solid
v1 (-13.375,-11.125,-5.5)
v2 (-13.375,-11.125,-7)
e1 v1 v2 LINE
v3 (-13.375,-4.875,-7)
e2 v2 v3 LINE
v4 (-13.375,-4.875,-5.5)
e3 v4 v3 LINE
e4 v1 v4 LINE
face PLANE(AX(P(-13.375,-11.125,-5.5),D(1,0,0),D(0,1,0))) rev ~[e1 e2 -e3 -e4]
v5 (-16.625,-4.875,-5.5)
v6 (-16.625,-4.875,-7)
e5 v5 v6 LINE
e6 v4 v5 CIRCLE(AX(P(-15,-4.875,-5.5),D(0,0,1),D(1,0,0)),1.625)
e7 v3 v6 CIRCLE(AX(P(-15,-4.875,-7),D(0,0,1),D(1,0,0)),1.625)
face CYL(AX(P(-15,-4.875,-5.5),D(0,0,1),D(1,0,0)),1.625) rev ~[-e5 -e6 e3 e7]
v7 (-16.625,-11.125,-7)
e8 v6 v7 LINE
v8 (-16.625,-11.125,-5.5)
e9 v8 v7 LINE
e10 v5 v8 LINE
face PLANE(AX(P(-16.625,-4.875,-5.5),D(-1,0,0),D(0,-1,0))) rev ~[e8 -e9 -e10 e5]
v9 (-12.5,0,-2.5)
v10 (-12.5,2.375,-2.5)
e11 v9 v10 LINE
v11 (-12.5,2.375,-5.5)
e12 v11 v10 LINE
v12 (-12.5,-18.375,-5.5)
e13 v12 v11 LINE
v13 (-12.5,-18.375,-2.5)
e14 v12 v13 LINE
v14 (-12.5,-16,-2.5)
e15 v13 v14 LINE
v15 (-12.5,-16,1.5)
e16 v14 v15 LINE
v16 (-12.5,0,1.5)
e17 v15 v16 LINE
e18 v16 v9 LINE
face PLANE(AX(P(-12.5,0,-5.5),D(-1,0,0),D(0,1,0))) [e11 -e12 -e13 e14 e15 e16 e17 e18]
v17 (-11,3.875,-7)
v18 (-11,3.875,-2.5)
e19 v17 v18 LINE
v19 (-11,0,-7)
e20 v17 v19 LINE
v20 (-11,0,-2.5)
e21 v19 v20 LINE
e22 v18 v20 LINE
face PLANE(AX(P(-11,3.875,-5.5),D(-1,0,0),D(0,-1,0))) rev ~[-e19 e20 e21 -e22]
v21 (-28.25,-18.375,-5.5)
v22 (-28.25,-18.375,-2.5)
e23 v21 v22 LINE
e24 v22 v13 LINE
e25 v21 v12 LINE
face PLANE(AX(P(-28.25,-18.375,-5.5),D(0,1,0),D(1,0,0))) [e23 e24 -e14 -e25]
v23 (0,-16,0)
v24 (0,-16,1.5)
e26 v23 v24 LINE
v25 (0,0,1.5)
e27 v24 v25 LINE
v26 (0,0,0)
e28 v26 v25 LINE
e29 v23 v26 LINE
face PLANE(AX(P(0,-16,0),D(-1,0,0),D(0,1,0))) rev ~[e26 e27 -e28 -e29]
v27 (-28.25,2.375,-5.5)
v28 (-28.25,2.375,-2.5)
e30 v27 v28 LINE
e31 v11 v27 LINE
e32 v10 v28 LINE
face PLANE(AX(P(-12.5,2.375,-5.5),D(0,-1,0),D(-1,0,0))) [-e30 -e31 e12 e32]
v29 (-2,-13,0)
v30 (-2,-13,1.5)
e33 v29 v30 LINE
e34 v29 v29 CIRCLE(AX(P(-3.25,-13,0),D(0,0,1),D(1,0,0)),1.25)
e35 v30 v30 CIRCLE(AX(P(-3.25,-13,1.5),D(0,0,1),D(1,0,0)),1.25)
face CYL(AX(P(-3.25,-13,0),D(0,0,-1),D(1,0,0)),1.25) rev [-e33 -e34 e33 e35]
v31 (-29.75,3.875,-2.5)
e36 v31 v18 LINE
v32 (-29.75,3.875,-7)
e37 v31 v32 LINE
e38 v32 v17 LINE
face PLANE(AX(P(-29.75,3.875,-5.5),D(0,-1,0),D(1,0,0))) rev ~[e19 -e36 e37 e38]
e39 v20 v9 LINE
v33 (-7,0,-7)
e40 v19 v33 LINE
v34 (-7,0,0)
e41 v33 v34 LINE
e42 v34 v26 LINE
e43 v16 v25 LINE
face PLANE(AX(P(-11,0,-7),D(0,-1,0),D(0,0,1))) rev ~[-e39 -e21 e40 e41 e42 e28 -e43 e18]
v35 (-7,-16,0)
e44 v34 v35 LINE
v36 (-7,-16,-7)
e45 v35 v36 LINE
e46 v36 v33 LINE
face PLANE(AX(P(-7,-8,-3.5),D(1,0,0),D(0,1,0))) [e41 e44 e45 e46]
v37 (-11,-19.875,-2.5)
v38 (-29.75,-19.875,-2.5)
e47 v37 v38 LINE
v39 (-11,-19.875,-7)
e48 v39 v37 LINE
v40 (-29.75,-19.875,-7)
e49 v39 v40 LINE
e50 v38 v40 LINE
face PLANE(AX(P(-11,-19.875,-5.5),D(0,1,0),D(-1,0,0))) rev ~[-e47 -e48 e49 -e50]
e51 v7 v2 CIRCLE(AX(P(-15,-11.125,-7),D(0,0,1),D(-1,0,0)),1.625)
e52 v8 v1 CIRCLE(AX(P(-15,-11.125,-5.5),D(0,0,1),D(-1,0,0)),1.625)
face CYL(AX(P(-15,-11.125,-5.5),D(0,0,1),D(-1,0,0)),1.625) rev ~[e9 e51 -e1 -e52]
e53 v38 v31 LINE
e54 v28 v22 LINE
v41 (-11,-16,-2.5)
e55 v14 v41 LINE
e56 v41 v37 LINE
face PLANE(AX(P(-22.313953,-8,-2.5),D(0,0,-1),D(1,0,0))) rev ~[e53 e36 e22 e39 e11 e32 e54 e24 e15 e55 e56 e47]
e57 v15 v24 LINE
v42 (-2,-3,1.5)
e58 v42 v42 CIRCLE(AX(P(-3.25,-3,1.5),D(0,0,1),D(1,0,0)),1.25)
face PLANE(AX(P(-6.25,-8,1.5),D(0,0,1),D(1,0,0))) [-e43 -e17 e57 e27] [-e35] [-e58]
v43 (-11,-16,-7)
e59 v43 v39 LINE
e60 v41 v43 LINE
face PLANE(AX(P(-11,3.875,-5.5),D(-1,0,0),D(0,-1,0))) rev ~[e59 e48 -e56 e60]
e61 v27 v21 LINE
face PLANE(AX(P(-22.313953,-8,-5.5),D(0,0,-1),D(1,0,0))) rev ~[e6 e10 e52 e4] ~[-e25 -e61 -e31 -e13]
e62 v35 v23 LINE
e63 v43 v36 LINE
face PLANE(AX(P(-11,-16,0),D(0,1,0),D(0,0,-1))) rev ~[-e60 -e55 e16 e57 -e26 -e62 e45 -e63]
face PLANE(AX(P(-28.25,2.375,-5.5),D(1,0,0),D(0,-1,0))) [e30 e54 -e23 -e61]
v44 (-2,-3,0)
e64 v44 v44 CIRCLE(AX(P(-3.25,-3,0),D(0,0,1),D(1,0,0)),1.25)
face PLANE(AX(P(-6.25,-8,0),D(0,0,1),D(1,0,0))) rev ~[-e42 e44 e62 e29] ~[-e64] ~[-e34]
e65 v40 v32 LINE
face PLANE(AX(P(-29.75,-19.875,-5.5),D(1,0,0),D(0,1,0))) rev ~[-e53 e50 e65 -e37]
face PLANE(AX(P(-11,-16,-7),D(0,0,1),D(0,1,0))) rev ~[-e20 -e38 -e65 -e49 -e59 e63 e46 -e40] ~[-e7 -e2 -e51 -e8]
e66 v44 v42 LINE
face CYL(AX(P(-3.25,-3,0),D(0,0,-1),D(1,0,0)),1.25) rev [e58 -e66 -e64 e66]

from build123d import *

# Parameters (mm, degrees)
F0_W     = 12.5
F0_H     = 16
F0_R     = 1.25
F1_DEPTH = 1.5
F2_W     = 1.5
F2_H     = 16
F3_DEPTH = 5.5
F5_DEPTH = 3
F4_W     = 1.5
F4_H     = 16
F6_DEPTH = 1.5
F8_DEPTH = 4


# Not quite as in the source:
# - a feature of the source that left no trace in its solid (it failed there, or was rolled back) is left out


with BuildPart() as f1:
    # F0 (on Top) → F1 (new body)
    with BuildSketch(Plane.XY):
        with Locations((-6.25, -8)):
            Rectangle(F0_W, F0_H)
        with Locations((-3.25, -13)):
            Circle(F0_R, mode=Mode.SUBTRACT)
        with Locations((-3.25, -3)):
            Circle(F0_R, mode=Mode.SUBTRACT)
    extrude(amount=F1_DEPTH)

    # F2 (on face) → F3 (join)
    with BuildSketch(Plane(origin=(0, 0, 0), x_dir=(1, 0, 0), z_dir=(0, 0, -1))):
        with Locations((-11.75, 8)):
            Rectangle(F2_W, F2_H)
    extrude(amount=F3_DEPTH)

    # F4 (on face) → F5 (join)
    with BuildSketch(Plane(origin=(0, 0, -5.5), x_dir=(1, 0, 0), z_dir=(0, 0, -1))):
        Polygon((-11, 16), (-11, 19.875), (-29.75, 19.875), (-29.75, -3.875), (-11, -3.875), (-11, 0), (-12.5, 0), (-12.5, -2.375), (-28.25, -2.375), (-28.25, 18.375), (-12.5, 18.375), (-12.5, 16), align=None)
    extrude(amount=-F5_DEPTH)

    # F4 (on face) → F6 (join)
    with BuildSketch(Plane(origin=(0, 0, -5.5), x_dir=(1, 0, 0), z_dir=(0, 0, -1))):
        Polygon((-11, 16), (-11, 19.875), (-29.75, 19.875), (-29.75, -3.875), (-11, -3.875), (-11, 0), (-12.5, 0), (-12.5, -2.375), (-28.25, -2.375), (-28.25, 18.375), (-12.5, 18.375), (-12.5, 16), align=None)
        with Locations((-11.75, 8)):
            Rectangle(F4_W, F4_H)
        Polygon((-12.5, 0), (-12.5, 16), (-12.5, 18.375), (-28.25, 18.375), (-28.25, -2.375), (-12.5, -2.375), align=None)
        with BuildLine():
            Line((-13.375, 11.125), (-13.375, 4.875))
            ThreePointArc((-13.375, 4.875), (-15, 3.25), (-16.625, 4.875))
            Line((-16.625, 4.875), (-16.625, 11.125))
            ThreePointArc((-16.625, 11.125), (-15, 12.75), (-13.375, 11.125))
        make_face(mode=Mode.SUBTRACT)
    extrude(amount=F6_DEPTH)

    # F7 (on face) → F8 (join)
    with BuildSketch(Plane.YZ.offset(-11)):
        Polygon((0, 0), (-16, 0), (-16, -2.5), (-16, -7), (0, -7), (0, -2.5), align=None)
    extrude(amount=F8_DEPTH)


solid = f1.part
